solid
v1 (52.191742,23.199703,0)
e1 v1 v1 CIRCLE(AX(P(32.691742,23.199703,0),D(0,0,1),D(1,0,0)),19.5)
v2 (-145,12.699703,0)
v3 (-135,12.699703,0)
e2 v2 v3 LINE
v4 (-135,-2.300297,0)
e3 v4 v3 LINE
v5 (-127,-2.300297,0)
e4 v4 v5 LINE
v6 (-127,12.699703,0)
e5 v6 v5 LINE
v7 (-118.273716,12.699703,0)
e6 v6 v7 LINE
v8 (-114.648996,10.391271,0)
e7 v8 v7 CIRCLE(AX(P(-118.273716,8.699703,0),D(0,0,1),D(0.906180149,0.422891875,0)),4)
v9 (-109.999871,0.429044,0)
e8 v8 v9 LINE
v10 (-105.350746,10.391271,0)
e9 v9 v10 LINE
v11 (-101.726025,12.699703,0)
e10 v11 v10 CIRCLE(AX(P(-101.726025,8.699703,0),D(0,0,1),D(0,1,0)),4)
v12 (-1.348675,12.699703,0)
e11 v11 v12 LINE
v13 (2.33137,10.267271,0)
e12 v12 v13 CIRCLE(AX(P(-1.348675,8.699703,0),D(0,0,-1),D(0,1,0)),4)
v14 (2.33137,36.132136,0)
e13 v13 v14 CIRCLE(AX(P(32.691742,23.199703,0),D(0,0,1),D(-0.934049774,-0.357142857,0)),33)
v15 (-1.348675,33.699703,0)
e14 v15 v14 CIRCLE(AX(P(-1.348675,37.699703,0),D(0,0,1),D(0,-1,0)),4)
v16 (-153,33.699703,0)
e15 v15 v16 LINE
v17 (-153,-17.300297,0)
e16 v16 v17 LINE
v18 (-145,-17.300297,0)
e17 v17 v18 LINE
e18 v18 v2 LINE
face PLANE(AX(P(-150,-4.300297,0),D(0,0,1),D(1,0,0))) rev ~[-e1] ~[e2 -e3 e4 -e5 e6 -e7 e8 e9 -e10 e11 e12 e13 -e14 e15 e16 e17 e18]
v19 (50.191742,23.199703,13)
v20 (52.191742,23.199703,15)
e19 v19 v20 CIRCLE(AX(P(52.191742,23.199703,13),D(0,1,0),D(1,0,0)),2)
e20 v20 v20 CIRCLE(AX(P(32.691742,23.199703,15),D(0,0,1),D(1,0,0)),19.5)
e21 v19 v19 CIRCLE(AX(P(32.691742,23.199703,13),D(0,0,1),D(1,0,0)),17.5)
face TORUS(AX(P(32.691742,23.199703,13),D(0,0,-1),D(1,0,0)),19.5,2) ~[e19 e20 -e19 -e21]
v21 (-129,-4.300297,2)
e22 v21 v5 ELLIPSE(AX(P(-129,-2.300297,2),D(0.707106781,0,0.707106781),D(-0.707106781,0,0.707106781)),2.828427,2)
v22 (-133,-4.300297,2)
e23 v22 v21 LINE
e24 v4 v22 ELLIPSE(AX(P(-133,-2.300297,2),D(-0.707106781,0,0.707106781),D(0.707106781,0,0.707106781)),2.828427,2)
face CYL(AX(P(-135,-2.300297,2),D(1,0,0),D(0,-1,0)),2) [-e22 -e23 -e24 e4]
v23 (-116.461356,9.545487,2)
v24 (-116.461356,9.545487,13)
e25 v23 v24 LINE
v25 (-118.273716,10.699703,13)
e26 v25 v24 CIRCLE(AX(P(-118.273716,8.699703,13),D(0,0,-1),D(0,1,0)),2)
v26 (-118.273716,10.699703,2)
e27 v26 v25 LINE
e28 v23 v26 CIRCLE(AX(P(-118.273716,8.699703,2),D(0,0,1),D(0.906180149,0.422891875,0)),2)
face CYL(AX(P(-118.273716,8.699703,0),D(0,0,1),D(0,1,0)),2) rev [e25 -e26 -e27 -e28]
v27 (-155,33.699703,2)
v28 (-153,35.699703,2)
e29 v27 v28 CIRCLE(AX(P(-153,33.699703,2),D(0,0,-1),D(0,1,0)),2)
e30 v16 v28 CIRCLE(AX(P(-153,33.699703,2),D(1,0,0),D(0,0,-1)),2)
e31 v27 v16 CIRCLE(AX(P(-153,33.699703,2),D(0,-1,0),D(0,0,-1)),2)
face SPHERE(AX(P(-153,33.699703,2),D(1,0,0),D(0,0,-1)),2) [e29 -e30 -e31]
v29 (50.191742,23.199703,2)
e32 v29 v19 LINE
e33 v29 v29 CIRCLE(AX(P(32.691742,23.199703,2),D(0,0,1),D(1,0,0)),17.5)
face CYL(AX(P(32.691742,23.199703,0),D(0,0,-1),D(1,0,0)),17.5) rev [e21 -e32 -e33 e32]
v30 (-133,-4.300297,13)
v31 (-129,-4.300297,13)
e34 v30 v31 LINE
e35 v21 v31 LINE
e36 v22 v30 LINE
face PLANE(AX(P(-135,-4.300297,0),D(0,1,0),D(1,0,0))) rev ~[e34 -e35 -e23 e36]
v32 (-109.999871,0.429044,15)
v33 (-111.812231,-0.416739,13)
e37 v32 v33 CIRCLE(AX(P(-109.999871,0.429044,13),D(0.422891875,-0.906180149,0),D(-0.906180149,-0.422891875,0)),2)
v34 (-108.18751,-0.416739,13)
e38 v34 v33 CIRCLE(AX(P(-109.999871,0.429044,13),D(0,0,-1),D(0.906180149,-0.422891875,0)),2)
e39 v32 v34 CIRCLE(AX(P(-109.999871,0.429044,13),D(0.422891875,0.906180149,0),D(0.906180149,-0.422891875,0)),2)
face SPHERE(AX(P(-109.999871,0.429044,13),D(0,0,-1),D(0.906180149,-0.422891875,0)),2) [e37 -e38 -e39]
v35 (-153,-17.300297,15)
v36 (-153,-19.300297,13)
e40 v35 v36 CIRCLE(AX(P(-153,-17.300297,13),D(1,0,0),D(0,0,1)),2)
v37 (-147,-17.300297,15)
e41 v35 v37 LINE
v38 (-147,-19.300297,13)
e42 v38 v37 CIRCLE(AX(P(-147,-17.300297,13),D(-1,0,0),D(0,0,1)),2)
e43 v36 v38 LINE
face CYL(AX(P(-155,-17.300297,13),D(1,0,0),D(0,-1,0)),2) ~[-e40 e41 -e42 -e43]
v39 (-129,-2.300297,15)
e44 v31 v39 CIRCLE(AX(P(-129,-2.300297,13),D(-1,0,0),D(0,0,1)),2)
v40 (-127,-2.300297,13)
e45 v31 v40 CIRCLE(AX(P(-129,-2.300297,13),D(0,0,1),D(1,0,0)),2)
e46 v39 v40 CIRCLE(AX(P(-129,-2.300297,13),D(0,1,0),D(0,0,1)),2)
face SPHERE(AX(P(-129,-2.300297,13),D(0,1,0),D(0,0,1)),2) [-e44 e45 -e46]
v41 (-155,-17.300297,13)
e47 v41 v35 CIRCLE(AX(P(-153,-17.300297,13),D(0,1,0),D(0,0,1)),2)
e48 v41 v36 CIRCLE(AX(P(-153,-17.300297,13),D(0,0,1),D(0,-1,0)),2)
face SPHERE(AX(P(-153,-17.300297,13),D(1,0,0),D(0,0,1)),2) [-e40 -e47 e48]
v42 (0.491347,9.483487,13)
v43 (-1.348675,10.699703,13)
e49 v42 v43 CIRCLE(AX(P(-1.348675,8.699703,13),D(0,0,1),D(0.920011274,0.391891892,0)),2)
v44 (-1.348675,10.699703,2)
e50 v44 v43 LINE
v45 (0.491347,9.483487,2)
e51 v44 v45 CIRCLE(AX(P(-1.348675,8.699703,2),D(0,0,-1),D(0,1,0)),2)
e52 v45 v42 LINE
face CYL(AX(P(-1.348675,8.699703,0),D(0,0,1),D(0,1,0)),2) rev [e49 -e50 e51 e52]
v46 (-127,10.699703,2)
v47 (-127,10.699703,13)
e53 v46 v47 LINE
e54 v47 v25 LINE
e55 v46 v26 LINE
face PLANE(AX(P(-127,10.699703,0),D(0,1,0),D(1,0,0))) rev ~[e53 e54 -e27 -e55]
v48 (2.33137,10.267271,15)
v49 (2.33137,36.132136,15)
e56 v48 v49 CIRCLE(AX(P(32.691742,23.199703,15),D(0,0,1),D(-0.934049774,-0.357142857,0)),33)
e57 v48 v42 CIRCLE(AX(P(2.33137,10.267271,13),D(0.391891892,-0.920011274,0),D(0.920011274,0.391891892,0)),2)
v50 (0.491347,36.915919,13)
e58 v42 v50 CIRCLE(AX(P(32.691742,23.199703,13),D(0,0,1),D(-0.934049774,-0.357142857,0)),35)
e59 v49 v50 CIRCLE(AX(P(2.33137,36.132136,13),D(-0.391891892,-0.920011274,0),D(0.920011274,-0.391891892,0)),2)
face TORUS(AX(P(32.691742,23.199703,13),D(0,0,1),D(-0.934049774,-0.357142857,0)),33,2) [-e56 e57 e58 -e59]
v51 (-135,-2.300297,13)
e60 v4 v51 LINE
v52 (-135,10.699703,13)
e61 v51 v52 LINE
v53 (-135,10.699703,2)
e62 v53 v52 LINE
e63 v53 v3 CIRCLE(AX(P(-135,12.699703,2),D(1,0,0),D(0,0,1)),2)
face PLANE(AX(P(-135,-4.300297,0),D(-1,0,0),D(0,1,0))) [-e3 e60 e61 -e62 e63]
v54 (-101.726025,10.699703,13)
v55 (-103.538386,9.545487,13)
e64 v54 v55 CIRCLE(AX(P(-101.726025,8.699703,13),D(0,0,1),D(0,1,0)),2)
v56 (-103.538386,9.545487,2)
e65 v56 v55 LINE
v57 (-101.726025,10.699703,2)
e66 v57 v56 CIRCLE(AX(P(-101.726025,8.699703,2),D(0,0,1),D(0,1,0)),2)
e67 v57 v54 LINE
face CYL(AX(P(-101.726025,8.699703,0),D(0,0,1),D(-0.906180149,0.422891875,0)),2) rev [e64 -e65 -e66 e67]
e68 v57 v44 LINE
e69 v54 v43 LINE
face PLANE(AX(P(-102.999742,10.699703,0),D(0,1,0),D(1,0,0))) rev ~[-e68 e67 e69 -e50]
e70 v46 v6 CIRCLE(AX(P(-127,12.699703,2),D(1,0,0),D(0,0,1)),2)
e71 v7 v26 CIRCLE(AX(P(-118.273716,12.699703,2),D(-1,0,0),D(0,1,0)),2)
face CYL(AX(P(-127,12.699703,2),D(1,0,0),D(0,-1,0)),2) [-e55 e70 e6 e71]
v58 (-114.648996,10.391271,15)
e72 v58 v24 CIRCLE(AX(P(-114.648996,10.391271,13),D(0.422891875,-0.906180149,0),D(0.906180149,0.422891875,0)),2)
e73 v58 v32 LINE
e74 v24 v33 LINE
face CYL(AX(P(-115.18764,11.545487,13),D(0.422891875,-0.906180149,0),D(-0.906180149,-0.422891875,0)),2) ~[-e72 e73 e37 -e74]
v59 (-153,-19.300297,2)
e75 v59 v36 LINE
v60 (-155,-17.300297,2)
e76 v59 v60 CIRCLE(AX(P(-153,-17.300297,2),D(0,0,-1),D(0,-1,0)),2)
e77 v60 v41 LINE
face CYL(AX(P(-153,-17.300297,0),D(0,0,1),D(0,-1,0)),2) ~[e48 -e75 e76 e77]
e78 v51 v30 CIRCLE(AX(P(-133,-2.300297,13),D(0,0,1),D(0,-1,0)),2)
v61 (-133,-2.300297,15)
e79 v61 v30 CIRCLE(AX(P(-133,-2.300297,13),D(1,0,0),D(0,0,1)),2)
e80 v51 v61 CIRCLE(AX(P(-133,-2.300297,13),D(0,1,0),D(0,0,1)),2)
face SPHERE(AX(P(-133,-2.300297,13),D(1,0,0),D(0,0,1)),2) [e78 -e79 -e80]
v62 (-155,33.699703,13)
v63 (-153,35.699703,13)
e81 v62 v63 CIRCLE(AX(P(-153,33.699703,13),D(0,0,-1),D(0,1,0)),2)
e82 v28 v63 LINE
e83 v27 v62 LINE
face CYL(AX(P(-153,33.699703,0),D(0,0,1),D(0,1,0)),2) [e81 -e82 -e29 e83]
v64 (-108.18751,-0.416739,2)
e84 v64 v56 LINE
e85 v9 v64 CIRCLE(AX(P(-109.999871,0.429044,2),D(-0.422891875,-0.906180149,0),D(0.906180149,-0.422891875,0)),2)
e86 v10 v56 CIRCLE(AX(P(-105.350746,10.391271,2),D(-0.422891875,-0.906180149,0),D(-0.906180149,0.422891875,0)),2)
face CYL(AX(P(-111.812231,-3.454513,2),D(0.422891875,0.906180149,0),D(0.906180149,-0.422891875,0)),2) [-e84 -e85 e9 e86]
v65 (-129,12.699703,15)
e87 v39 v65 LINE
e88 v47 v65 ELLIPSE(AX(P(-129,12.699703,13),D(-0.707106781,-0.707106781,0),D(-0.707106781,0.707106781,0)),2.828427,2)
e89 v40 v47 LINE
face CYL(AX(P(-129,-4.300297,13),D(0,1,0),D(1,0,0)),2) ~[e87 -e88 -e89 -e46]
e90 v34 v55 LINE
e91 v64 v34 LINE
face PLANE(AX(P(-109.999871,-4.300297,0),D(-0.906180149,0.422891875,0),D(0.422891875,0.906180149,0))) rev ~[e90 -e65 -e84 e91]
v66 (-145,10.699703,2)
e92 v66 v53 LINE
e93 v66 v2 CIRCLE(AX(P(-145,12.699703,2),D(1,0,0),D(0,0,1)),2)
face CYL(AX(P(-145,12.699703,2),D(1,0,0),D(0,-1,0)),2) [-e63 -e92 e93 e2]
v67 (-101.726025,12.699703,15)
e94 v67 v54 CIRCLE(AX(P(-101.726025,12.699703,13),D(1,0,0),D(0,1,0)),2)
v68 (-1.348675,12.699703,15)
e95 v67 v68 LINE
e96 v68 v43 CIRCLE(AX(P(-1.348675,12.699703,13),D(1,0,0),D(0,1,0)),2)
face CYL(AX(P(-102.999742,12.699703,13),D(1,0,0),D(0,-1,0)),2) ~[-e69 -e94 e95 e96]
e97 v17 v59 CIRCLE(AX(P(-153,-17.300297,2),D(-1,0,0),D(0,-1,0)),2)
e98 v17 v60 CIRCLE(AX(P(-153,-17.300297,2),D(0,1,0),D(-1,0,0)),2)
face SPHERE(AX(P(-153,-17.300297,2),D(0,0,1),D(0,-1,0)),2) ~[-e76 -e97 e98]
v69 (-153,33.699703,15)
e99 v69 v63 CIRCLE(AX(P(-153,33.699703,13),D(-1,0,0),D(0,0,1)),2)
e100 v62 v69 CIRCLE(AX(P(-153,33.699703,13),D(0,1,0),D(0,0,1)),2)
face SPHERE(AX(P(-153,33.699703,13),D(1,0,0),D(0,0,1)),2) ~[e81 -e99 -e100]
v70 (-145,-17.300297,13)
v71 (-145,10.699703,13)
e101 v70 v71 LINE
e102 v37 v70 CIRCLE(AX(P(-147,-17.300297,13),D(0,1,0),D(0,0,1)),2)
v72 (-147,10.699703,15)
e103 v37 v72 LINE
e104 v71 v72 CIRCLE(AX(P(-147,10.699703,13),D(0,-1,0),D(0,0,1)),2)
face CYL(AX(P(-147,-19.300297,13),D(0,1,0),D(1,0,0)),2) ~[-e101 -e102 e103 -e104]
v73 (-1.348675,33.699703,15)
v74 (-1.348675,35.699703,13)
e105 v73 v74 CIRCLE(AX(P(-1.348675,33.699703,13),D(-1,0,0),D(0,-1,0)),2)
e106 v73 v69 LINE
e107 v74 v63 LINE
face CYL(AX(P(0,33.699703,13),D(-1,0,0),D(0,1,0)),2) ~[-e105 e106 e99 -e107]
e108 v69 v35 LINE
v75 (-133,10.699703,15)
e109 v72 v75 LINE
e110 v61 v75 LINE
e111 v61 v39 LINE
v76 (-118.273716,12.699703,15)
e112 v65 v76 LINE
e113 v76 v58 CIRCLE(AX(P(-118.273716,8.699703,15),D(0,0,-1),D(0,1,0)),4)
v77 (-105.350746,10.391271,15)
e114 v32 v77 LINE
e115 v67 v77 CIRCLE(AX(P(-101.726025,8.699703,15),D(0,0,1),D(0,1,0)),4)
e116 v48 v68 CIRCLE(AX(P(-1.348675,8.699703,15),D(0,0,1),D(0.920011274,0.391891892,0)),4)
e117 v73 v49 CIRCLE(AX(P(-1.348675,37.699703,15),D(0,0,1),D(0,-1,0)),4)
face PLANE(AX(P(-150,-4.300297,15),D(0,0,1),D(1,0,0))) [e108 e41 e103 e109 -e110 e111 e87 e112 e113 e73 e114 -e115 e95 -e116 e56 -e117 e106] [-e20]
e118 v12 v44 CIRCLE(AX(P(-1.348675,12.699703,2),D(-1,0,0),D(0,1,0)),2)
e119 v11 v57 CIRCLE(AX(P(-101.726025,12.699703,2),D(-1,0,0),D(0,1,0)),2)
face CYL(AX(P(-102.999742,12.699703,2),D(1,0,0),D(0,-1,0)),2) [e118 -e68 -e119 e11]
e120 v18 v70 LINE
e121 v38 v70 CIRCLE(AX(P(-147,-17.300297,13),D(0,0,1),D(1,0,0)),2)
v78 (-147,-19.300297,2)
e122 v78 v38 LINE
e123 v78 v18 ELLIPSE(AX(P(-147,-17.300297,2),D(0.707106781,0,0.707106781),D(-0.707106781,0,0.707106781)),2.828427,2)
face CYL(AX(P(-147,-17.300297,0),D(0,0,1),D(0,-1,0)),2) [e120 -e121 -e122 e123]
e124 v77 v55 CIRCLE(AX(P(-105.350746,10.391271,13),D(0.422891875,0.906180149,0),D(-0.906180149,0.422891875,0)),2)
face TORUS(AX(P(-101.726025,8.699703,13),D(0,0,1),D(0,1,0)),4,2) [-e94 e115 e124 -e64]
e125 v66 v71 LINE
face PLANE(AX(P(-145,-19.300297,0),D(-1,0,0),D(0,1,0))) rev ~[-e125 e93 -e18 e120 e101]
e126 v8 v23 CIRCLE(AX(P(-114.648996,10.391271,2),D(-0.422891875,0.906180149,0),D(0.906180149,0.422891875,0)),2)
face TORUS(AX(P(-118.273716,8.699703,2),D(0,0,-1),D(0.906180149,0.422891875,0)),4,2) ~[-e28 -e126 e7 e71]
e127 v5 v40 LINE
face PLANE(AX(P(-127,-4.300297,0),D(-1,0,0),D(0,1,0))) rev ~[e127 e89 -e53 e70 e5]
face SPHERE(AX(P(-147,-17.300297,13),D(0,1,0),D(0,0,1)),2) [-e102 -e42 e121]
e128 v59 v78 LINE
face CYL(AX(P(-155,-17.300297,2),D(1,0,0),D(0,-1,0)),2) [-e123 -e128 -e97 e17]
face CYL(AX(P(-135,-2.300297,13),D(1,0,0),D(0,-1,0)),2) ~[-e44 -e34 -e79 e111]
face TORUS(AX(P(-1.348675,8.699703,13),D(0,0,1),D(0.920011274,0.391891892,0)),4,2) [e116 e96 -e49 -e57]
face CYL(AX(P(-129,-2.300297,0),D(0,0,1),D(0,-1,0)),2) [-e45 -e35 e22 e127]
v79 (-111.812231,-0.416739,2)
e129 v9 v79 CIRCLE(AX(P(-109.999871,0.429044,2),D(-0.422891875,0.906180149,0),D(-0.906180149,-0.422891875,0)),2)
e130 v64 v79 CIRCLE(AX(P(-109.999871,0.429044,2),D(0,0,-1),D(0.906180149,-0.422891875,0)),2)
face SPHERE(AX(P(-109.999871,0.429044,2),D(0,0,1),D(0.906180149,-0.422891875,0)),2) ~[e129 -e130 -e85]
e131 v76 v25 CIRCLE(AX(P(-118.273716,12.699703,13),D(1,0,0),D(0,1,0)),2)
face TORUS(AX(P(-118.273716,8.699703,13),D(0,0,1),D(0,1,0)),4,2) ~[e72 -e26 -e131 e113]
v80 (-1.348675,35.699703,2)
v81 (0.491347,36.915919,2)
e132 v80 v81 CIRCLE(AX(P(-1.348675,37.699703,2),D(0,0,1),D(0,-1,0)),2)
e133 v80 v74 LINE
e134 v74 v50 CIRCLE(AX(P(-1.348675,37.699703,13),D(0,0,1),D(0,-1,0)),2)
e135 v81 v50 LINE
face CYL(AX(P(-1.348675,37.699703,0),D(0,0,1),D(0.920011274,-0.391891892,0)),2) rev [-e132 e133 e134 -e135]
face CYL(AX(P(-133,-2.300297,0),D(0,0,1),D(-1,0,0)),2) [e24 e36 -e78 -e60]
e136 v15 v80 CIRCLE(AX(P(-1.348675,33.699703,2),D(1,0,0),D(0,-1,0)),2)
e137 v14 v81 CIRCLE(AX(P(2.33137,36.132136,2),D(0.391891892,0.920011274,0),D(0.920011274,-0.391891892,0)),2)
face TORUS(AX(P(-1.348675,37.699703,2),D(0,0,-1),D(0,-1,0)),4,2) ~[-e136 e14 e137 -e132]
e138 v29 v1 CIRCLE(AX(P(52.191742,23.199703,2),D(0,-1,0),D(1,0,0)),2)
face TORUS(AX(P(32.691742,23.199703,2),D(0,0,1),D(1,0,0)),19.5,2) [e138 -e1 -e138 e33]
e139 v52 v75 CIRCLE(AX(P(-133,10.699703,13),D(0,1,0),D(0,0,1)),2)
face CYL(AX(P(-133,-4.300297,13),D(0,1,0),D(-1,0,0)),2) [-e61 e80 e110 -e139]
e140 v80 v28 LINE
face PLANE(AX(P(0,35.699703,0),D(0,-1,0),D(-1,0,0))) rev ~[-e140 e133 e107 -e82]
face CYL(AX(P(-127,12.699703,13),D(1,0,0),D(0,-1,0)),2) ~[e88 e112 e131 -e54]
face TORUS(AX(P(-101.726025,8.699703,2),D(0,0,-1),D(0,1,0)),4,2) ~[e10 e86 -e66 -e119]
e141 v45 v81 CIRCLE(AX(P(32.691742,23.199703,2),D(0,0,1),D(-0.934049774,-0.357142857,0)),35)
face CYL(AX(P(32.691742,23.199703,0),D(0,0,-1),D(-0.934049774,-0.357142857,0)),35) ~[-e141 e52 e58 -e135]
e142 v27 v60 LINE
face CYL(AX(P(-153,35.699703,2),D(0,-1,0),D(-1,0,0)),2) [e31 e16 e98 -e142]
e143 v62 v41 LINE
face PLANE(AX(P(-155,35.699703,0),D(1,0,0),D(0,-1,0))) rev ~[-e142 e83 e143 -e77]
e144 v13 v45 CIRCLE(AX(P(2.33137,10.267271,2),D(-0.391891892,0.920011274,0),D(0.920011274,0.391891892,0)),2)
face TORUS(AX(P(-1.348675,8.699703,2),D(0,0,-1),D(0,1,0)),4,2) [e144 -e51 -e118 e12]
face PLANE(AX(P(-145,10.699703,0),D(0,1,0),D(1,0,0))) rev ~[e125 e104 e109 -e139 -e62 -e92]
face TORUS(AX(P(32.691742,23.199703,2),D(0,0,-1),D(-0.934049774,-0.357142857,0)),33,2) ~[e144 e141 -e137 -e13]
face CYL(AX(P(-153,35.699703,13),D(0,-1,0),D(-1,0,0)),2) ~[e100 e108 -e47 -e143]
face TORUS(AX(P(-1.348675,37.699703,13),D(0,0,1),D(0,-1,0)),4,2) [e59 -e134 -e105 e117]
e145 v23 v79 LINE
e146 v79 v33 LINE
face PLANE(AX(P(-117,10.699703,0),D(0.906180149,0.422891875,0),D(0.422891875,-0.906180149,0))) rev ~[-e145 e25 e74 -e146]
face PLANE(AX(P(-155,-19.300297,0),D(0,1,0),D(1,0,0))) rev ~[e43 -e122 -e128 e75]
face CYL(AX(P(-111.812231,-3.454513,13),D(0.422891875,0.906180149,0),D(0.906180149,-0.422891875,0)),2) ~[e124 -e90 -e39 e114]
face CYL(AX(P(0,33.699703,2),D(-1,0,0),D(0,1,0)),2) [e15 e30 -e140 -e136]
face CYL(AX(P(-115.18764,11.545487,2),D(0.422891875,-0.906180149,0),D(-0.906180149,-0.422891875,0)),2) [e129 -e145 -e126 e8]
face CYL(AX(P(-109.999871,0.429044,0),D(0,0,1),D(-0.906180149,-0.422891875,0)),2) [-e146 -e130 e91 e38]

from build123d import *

# Parameters (mm, degrees)
F0_W     = 10
F0_H     = 30
F0_W_2   = 8
F0_H_2   = 15
F0_R     = 17.5
F1_DEPTH = 15
F2_R     = 2


with BuildPart() as f1:
    # F0 (on Top) → F1 (new body)
    with BuildSketch(Plane.XY):
        with Locations((-150, -4.3002969027)):
            Rectangle(F0_W, F0_H)
        with Locations((-131, 3.1997030973)):
            Rectangle(F0_W_2, F0_H_2)
        Polygon((-109.9998707869, -4.3002969027), (-102.9997415738, 10.6997030973), (-117, 10.6997030973), align=None)
        with BuildLine():
            Line((0, 35.6997030973), (0, 10.6997030973))
            ThreePointArc((0, 10.6997030973), (67.6917420766, 23.1997030973), (0, 35.6997030973))
        make_face()
        with Locations((32.6917420766, 23.1997030973)):
            Circle(F0_R, mode=Mode.SUBTRACT)
        Polygon((-102.9997415738, 10.6997030973), (0, 10.6997030973), (0, 35.6997030973), (-155, 35.6997030973), (-155, 10.6997030973), (-145, 10.6997030973), (-135, 10.6997030973), (-127, 10.6997030973), (-117, 10.6997030973), align=None)
    extrude(amount=F1_DEPTH)

    # F2
    f2_edges = [f1.edges().sort_by_distance(p)[0] for p in [
        (-77.5, 35.699703, 15),
        (67.691742, 23.199703, 15),
        (15.191742, 23.199703, 15),
        (-51.499871, 10.699703, 15),
        (-106.499806, 3.199703, 15),
        (-113.499935, 3.199703, 15),
        (-127, 3.199703, 15),
        (-131, -4.300297, 15),
        (-135, 3.199703, 15),
        (-145, -4.300297, 15),
        (-150, -19.300297, 15),
        (-155, 8.199703, 15),
        (-77.5, 35.699703, 0),
        (67.691742, 23.199703, 0),
        (15.191742, 23.199703, 0),
        (-102.999742, 10.699703, 7.5),
        (-109.999871, -4.300297, 7.5),
        (-117, 10.699703, 7.5),
        (-127, -4.300297, 7.5),
        (-145, -19.300297, 7.5),
        (-135, -4.300297, 7.5),
        (-155, -19.300297, 7.5),
        (0, 10.699703, 7.5),
        (-51.499871, 10.699703, 0),
        (-106.499806, 3.199703, 0),
        (-113.499935, 3.199703, 0),
        (-131, -4.300297, 0),
        (-150, -19.300297, 0),
        (-122, 10.699703, 0),
        (-140, 10.699703, 0),
        (-155, 8.199703, 0),
        (-155, 35.699703, 7.5),
        (0, 35.699703, 7.5),
        (-122, 10.699703, 15),
    ]]
    fillet(f2_edges, radius=F2_R)


solid = f1.part
